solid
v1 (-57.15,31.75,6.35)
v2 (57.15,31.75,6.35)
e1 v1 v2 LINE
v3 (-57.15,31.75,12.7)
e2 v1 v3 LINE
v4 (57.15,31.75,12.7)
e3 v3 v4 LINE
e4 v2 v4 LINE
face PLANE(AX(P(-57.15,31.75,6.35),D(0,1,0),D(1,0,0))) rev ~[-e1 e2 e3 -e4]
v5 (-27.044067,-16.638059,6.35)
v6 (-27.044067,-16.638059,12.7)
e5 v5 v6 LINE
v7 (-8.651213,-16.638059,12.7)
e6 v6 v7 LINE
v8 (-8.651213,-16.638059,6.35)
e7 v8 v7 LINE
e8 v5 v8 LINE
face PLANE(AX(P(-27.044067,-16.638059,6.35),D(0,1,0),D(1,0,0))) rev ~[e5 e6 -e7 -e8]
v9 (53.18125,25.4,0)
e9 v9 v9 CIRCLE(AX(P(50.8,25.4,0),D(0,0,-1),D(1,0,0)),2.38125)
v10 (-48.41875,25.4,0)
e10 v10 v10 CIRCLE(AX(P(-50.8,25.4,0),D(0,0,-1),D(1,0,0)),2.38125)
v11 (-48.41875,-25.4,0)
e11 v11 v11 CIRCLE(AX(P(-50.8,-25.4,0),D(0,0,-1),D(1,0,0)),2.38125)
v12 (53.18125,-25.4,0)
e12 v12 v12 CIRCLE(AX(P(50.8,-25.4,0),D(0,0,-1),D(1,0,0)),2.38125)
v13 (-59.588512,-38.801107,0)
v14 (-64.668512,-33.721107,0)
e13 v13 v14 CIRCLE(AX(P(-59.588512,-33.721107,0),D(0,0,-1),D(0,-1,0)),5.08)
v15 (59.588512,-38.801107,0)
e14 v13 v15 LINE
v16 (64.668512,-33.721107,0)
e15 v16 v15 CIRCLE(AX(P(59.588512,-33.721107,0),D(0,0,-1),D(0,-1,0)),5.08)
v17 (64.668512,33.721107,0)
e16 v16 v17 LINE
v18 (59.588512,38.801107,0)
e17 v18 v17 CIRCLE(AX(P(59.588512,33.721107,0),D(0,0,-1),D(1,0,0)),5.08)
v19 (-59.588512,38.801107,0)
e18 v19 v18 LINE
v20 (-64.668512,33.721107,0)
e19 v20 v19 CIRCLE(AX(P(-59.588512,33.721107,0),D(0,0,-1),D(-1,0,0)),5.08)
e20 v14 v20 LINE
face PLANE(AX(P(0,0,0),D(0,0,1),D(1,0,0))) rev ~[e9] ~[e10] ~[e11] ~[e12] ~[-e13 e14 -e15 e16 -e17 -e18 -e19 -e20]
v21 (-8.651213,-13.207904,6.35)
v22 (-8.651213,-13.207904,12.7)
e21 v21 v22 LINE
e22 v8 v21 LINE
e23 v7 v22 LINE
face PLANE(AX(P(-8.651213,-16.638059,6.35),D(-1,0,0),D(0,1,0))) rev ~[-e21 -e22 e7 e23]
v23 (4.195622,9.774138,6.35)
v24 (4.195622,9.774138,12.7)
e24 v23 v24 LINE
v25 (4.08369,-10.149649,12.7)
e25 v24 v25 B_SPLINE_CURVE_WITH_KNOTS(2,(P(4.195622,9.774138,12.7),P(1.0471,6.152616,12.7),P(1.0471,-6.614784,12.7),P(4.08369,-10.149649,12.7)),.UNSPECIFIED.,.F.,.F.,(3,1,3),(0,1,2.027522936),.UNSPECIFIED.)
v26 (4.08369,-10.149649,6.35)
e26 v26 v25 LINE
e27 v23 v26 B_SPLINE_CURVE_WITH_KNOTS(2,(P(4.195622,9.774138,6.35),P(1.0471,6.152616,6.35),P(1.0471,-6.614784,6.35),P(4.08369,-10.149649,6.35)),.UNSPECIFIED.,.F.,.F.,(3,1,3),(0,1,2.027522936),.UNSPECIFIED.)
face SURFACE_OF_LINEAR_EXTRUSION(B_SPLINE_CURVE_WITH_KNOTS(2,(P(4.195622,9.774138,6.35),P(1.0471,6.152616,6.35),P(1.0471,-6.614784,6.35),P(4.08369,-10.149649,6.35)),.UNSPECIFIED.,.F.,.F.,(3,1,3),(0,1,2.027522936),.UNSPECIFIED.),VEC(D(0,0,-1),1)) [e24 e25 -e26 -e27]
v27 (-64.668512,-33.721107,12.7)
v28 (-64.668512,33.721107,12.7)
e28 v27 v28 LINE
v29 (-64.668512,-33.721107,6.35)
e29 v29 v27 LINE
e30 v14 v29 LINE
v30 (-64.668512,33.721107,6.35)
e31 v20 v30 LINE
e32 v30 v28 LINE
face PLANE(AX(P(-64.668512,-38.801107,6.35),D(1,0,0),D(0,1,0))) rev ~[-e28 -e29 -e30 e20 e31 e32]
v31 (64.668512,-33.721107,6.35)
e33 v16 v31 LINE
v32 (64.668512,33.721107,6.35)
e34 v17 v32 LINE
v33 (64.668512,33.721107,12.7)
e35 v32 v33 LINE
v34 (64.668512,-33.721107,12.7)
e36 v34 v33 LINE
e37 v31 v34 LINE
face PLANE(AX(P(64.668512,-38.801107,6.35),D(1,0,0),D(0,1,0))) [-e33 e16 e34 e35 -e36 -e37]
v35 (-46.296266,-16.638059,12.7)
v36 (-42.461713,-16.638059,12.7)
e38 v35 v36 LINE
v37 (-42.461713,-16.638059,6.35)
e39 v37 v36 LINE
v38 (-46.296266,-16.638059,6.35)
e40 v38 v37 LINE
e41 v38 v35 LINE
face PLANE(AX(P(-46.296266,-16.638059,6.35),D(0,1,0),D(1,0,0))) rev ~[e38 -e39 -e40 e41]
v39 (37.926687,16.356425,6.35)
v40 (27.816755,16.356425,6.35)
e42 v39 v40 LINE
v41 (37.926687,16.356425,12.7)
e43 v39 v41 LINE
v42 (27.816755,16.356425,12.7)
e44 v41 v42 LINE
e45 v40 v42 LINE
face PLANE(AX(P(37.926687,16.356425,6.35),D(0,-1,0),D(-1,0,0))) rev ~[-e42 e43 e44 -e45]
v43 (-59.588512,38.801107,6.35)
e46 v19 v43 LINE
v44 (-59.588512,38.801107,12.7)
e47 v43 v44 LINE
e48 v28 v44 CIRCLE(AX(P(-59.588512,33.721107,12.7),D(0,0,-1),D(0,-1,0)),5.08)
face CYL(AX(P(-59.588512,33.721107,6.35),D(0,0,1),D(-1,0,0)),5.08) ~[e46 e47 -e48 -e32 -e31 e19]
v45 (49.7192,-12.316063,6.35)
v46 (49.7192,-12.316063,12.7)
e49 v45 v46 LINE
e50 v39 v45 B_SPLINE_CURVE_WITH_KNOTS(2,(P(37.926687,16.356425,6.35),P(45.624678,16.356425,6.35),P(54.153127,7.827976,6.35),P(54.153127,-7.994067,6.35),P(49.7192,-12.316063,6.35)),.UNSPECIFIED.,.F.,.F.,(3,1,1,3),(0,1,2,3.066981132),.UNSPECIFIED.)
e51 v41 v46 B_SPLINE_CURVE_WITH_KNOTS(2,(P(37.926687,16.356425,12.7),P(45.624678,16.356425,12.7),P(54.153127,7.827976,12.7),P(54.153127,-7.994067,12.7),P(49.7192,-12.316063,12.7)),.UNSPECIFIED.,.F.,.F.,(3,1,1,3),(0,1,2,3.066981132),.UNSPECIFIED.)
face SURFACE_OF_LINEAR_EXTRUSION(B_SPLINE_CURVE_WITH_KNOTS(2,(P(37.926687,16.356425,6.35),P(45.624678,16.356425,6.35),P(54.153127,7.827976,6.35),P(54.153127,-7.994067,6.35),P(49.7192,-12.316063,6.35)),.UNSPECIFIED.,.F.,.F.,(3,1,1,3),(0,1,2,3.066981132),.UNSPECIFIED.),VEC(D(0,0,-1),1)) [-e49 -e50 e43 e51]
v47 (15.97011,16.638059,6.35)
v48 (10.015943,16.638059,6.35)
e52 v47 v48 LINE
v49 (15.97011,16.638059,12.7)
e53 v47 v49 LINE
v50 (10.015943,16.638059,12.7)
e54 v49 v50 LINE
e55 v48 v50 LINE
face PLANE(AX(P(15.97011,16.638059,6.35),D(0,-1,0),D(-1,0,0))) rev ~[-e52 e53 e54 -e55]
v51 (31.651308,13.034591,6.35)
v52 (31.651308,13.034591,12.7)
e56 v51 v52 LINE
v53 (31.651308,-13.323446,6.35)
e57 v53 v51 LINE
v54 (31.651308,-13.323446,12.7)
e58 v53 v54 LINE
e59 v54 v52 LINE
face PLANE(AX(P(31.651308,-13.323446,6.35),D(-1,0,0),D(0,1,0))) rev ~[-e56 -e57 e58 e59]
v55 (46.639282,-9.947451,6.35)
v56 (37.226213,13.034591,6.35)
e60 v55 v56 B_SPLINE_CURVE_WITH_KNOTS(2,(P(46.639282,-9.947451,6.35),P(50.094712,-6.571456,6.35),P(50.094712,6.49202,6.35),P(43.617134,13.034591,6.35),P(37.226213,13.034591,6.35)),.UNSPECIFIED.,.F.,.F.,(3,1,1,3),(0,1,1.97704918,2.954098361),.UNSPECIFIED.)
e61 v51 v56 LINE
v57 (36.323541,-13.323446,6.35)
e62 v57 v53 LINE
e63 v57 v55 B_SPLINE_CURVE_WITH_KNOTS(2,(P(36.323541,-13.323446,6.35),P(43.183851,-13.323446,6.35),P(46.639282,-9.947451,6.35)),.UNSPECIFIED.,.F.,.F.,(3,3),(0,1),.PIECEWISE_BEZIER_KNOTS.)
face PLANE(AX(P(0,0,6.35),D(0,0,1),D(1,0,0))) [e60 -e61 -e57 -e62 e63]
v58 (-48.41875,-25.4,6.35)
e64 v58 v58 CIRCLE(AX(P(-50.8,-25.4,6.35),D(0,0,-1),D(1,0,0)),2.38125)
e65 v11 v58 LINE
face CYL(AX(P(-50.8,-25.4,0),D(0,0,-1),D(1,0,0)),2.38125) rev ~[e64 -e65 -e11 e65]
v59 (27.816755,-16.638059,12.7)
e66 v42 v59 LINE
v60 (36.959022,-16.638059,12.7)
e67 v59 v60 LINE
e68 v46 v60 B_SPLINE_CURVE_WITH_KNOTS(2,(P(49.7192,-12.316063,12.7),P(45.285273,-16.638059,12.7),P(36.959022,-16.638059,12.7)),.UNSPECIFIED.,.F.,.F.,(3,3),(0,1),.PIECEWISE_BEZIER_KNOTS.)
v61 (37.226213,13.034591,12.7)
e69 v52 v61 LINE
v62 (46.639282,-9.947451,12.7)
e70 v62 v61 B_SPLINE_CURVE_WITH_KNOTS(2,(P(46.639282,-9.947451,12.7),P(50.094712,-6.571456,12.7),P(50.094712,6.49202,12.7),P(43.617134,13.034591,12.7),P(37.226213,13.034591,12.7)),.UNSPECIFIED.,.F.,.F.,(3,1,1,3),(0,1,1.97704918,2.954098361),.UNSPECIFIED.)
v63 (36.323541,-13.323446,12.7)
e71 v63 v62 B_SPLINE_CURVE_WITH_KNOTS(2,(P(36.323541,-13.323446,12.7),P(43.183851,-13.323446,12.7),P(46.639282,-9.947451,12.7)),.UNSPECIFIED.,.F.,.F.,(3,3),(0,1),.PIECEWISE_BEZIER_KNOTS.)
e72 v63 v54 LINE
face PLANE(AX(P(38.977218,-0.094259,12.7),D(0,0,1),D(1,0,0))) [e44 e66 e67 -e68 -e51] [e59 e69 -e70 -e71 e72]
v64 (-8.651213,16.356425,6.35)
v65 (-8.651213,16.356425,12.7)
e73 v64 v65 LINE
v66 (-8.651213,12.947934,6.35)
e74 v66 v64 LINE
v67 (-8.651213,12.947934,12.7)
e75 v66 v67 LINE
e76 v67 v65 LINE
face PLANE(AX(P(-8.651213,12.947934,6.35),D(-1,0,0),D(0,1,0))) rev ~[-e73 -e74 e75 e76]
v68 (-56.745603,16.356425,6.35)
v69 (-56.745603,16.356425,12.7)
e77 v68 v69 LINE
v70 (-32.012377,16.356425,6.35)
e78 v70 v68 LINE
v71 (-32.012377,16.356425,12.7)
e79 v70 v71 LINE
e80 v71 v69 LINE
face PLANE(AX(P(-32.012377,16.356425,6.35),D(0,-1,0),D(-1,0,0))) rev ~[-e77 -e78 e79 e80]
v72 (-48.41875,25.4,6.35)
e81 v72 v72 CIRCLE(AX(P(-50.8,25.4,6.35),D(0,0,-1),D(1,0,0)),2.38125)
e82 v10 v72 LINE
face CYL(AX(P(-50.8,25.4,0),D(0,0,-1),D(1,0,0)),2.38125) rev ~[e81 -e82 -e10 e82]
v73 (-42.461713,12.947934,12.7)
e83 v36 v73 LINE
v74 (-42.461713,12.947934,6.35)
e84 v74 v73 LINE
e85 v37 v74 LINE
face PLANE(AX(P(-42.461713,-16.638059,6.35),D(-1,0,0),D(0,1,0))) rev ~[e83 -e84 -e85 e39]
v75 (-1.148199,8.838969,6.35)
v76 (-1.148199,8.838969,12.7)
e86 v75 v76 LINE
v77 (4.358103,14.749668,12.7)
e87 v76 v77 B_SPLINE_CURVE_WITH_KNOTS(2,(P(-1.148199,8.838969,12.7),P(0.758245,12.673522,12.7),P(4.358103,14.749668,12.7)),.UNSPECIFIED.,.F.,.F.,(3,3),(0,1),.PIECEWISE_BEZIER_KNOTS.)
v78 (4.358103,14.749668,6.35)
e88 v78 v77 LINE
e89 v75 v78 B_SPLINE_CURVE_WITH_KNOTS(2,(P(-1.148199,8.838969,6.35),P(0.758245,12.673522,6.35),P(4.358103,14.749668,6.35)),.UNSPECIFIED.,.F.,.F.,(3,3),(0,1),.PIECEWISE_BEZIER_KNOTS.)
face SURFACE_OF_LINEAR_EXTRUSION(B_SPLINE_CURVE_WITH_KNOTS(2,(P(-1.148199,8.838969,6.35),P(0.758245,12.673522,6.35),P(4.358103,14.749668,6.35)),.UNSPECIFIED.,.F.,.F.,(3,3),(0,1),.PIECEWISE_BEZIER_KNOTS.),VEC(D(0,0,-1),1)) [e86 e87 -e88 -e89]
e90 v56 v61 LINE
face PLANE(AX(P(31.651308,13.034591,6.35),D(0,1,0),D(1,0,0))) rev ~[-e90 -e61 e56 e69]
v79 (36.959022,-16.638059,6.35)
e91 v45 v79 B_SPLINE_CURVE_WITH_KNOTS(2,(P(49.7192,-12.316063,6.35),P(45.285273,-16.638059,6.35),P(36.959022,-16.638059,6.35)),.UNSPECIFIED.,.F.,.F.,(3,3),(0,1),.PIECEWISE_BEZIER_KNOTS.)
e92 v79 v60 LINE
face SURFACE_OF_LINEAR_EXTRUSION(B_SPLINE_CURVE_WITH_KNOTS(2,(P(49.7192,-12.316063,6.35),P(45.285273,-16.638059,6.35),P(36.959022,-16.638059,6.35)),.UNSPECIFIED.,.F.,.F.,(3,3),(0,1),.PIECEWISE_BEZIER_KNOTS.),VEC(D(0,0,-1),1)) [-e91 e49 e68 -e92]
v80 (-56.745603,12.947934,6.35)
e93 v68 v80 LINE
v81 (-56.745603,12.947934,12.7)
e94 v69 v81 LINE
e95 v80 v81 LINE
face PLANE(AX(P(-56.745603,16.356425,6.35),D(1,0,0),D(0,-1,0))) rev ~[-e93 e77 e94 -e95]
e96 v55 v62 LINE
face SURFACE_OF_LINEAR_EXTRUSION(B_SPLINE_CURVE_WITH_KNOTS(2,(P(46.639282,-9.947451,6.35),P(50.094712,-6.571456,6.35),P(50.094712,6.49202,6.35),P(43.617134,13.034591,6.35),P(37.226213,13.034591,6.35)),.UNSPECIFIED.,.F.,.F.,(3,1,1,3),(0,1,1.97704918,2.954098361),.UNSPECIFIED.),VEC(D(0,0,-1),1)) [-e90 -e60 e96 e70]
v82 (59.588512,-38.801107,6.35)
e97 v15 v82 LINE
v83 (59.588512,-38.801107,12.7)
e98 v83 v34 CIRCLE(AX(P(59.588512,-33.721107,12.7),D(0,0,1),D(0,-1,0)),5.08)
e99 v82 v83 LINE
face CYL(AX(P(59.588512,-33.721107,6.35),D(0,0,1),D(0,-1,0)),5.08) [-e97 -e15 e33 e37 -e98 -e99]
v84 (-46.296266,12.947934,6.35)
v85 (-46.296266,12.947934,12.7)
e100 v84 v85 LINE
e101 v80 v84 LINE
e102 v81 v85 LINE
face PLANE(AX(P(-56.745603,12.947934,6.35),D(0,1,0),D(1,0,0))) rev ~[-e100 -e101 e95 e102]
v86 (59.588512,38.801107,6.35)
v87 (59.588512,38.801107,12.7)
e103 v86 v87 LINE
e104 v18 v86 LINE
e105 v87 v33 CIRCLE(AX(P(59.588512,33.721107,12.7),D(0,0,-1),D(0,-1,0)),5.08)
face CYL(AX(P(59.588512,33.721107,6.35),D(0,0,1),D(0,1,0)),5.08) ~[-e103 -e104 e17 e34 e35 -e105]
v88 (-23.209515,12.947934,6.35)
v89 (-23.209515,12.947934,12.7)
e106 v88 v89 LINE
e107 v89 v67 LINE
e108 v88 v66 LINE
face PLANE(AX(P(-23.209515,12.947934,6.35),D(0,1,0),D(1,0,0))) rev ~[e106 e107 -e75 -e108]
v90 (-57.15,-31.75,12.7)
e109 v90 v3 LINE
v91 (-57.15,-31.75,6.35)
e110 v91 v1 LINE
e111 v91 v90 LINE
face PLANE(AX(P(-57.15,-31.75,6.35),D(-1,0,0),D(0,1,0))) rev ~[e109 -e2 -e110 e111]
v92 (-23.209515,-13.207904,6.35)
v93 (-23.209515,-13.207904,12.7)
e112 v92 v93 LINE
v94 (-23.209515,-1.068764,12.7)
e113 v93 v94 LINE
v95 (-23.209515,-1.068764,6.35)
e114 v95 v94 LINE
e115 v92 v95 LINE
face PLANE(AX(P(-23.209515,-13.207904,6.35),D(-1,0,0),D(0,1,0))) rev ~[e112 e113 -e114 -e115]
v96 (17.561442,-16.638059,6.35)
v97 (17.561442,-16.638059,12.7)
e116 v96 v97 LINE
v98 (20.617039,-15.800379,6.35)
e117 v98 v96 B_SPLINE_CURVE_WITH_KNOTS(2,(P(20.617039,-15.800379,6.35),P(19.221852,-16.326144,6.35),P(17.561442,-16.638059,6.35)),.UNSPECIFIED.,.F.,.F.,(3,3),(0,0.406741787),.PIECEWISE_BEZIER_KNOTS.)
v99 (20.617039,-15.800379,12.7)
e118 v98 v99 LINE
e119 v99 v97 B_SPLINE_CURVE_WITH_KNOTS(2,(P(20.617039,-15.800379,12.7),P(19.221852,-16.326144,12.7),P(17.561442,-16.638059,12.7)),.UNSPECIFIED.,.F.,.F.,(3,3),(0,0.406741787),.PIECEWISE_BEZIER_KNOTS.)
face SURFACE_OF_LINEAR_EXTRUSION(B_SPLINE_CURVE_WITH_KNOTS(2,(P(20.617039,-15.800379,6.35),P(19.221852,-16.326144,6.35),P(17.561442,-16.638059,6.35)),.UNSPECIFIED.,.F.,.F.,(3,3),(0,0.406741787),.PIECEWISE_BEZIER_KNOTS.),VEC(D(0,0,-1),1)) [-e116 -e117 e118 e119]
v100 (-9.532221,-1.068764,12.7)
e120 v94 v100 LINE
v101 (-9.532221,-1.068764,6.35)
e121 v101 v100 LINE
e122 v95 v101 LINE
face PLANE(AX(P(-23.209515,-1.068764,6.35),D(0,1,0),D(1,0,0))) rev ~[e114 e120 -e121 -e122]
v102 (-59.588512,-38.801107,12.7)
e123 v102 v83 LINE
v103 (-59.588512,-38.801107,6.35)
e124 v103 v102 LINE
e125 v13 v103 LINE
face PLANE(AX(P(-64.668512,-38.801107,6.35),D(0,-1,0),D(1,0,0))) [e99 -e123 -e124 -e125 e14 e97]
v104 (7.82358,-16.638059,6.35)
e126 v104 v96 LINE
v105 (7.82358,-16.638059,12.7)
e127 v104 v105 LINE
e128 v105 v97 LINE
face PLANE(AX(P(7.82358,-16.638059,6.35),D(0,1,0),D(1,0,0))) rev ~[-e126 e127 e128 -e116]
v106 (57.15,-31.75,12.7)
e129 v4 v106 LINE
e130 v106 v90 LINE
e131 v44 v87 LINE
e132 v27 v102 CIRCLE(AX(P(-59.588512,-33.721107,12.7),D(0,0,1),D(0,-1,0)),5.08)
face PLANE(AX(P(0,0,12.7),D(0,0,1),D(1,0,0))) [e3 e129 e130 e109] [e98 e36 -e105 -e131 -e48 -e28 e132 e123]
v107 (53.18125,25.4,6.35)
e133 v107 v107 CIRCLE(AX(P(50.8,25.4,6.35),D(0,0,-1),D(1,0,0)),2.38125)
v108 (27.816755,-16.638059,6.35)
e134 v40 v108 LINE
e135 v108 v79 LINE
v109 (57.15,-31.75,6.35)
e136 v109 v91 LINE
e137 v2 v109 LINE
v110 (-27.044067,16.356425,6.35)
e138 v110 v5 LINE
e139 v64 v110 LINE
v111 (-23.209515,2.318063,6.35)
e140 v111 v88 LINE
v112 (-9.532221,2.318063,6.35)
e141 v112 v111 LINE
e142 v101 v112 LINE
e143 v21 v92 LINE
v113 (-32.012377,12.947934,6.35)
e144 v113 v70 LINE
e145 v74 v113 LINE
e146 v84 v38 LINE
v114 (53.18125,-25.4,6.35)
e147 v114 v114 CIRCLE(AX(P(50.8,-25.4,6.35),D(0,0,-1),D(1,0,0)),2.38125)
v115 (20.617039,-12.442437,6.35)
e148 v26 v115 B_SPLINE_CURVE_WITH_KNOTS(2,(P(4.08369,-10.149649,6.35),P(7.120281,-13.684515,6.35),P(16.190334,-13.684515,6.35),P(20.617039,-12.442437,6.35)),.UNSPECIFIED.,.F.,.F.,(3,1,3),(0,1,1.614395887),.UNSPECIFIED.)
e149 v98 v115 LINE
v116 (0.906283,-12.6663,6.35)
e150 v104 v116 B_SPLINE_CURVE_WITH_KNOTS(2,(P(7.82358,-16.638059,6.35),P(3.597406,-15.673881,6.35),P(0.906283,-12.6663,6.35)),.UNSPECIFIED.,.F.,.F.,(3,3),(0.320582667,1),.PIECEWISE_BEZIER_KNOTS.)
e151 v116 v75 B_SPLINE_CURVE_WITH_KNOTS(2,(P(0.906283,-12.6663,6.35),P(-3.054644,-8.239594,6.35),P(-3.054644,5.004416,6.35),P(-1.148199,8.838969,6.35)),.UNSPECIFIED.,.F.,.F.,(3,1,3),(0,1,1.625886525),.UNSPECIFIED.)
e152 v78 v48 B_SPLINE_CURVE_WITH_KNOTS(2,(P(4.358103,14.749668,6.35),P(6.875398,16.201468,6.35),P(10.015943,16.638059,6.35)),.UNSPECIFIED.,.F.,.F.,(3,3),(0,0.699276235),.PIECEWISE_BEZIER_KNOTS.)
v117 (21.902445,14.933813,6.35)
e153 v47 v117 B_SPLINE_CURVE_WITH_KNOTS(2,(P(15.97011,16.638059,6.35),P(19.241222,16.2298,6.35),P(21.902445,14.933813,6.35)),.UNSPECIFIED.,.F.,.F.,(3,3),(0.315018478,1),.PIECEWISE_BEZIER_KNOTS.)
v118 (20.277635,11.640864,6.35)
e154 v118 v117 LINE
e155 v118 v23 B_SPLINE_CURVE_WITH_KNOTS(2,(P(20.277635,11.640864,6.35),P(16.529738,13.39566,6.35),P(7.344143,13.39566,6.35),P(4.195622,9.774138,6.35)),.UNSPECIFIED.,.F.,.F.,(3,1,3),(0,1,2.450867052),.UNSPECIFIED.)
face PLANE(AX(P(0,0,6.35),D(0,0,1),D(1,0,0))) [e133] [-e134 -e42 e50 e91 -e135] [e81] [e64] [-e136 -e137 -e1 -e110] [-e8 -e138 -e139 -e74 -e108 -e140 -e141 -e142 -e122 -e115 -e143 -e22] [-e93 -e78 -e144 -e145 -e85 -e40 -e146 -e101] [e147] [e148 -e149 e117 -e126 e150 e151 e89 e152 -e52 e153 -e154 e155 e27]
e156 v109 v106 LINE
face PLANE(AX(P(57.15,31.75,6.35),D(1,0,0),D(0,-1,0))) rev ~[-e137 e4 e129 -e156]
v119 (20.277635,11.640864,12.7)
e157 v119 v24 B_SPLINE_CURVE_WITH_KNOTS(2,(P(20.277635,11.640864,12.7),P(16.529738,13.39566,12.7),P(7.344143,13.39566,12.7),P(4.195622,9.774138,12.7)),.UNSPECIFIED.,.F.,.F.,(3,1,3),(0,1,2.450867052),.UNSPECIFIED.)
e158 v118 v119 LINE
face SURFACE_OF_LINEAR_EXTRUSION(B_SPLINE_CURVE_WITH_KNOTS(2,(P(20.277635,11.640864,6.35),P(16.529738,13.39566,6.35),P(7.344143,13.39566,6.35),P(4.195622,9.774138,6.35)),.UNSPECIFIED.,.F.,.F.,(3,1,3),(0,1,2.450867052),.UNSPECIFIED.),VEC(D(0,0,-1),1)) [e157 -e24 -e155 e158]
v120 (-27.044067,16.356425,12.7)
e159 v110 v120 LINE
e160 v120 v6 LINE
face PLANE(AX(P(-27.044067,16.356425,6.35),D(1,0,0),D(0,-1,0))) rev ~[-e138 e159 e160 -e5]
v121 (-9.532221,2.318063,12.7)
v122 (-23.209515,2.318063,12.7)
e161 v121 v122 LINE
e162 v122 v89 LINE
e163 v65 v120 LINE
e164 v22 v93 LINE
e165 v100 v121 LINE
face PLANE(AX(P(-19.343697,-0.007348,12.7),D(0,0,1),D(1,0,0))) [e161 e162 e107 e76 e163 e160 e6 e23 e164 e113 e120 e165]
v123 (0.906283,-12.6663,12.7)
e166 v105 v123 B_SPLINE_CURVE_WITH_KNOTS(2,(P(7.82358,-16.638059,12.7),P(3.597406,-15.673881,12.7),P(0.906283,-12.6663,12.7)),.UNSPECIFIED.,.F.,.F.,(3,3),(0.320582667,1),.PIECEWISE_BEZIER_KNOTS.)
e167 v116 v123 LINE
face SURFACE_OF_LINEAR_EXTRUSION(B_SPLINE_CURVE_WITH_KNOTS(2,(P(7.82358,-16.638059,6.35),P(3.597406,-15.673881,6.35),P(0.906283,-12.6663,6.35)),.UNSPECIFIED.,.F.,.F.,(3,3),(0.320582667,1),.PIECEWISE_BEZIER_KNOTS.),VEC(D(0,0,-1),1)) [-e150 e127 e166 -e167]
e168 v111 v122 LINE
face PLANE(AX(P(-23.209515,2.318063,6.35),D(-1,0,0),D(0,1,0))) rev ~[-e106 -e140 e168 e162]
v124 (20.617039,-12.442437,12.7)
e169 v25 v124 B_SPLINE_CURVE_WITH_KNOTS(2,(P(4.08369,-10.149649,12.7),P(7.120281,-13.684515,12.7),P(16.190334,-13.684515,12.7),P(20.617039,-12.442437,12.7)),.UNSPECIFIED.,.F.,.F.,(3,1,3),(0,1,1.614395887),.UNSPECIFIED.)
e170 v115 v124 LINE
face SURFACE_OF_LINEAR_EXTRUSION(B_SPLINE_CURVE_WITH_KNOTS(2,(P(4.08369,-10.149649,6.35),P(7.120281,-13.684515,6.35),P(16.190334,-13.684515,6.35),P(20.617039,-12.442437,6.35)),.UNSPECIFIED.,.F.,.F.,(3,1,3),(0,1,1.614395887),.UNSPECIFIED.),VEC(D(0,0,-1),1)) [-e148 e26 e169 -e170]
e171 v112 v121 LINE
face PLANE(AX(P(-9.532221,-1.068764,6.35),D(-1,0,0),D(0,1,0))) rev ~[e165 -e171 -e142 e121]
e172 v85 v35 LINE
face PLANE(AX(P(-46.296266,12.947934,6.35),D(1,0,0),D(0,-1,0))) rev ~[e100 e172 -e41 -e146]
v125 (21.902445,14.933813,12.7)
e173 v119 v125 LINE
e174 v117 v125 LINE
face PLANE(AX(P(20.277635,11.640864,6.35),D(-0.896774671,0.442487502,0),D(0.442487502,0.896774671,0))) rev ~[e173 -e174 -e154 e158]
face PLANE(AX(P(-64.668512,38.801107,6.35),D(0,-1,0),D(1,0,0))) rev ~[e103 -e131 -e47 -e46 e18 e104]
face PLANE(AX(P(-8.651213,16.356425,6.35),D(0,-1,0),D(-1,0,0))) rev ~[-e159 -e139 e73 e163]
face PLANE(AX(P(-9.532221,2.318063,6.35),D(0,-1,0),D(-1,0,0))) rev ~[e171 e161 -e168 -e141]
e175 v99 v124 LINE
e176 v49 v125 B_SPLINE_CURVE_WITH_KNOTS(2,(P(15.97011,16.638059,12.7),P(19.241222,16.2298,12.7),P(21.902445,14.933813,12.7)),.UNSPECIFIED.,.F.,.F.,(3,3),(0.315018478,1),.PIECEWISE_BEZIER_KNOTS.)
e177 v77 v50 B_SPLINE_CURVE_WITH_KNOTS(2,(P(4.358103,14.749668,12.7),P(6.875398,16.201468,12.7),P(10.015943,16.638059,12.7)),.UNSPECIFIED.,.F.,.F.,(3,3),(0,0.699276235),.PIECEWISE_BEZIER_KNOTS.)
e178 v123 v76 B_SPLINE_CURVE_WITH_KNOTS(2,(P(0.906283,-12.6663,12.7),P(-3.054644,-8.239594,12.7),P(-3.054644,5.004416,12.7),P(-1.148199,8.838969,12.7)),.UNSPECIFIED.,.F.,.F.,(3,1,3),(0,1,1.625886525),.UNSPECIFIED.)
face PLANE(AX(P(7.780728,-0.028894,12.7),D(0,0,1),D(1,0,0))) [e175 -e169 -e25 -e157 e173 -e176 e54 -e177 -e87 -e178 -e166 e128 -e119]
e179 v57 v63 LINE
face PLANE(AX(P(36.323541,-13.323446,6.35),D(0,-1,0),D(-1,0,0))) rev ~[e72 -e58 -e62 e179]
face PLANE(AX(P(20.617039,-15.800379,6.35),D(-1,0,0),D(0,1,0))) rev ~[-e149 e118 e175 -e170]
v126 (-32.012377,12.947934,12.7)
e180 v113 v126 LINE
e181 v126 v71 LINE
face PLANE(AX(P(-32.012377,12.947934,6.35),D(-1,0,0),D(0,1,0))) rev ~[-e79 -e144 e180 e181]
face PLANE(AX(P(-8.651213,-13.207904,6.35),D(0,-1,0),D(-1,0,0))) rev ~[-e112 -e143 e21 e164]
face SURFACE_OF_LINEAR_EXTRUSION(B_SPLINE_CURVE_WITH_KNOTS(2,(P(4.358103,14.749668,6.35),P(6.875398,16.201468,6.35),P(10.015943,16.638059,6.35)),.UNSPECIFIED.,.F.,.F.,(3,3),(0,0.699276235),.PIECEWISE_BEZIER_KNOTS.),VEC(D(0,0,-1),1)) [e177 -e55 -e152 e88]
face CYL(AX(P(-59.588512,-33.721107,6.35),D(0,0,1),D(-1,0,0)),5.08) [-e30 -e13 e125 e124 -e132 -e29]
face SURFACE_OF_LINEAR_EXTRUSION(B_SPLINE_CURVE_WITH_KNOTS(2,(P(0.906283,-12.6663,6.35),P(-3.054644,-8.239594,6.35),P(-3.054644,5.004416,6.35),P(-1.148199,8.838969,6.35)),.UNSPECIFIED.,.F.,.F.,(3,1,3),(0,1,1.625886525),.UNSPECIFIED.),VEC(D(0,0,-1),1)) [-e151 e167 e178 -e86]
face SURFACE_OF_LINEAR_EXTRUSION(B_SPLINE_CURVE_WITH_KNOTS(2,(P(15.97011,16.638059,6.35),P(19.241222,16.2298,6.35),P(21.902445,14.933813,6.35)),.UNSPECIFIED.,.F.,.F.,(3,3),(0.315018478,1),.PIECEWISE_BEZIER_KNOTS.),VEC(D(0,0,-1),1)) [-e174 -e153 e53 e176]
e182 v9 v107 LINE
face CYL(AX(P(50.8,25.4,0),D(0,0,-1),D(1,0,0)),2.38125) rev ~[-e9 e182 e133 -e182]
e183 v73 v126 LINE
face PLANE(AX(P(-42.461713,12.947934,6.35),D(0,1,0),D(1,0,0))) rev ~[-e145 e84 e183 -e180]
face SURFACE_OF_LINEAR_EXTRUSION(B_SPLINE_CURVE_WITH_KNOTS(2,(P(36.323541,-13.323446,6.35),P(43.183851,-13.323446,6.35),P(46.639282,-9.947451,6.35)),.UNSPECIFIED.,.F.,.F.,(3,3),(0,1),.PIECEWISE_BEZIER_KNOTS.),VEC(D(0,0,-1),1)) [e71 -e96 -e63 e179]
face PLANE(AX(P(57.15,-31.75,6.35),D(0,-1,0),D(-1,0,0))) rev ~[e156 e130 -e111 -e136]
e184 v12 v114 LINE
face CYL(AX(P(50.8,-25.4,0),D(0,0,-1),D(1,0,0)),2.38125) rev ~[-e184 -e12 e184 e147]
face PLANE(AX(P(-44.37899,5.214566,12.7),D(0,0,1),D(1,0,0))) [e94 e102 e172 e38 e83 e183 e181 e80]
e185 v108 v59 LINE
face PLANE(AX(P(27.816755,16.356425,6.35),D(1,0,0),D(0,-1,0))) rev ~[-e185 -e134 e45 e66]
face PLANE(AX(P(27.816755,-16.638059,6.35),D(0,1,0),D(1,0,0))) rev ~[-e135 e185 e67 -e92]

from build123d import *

# Parameters (mm, degrees)
F0_W         = 127
F0_H         = 76.2
F1_DEPTH     = 6.35
F2_R         = 5.08
F4_W         = 129.3370249418
F4_H         = 77.6022149651
F5_DEPTH     = 6.35
F6_R         = 5.08
F7_DEPTH     = 6.35
F8_R         = 2.38125
F9_DEPTH     = 25.4
F10_DEPTH    = 6.35
F11_T1_DEPTH = 31.75


# Not quite as in the source:
# - a fillet or chamfer that OpenCascade refuses, or shapes differently, is made with other operations: its cross-section is extruded or revolved along the edge and cut away or added


with BuildPart() as f1:
    # F0 (on Top) → F1 (new body)
    with BuildSketch(Plane.XY):
        Rectangle(F0_W, F0_H)
    extrude(amount=F1_DEPTH)

    # F2
    f2_edges = [f1.edges().sort_by_distance(p)[0] for p in [
        (-63.5, 38.1, 3.175),
        (-63.5, -38.1, 3.175),
        (63.5, -38.1, 3.175),
        (63.5, 38.1, 3.175),
    ]]
    fillet(f2_edges, radius=F2_R)

    # F4 (on offset) → F5 (join)
    with BuildSketch(Plane.XY.offset(6.35)):
        Rectangle(F4_W, F4_H)
        Polygon((-57.15, -16.6380591357), (-57.15, 16.6380591357), (-57.15, 31.75), (57.15, 31.75), (57.15, 16.6380591357), (57.15, -16.6380591357), (57.15, -31.75), (-57.15, -31.75), align=None, mode=Mode.SUBTRACT)
    extrude(amount=F5_DEPTH)

    # F6
    f6_edges = [f1.edges().sort_by_distance(p)[0] for p in [
        (-64.668512, -38.801107, 9.525),
        (64.668512, 38.801107, 9.525),
        (64.668512, -38.801107, 9.525),
        (-64.668512, 38.801107, 9.525),
    ]]
    fillet(f6_edges, radius=F6_R)

    # F4 (on offset) → F7 (join)
    with BuildSketch(Plane.XY.offset(6.35)):
        Polygon((-46.2962661107, 12.9479340409), (-46.2962661107, -16.6380591357), (-42.4617134193, -16.6380591357), (-42.4617134193, 12.9479340409), (-32.0123768006, 12.9479340409), (-32.0123768006, 16.3564253222), (-56.7456027293, 16.3564253222), (-56.7456027293, 12.9479340409), align=None)
        Polygon((-27.0440674754, 16.3564253222), (-27.0440674754, -16.6380591357), (-8.6512130402, -16.6380591357), (-8.6512130402, -13.2079037149), (-23.2095147839, -13.2079037149), (-23.2095147839, -1.0687642153), (-9.5322213798, -1.0687642153), (-9.5322213798, 2.3180629265), (-23.2095147839, 2.3180629265), (-23.2095147839, 12.9479340409), (-8.6512130402, 12.9479340409), (-8.6512130402, 16.3564253222), align=None)
        with BuildLine():
            Line((15.9701099418, 16.6380591357), (10.0159430302, 16.6380591357))
            add(Edge.make_bspline(
                [(4.3581027293, 14.7496683093), (6.8753977724, 16.2014683592), (10.0159430302, 16.6380591357)],
                knots=[0, 0, 0, 0.6992762354, 0.6992762354, 0.6992762354], degree=2))
            add(Edge.make_bspline(
                [(-1.1481993935, 8.8389689158), (0.7582448825, 12.6735216073), (4.3581027293, 14.7496683093)],
                knots=[0, 0, 0, 1, 1, 1], degree=2))
            add(Edge.make_bspline(
                [(-3.0546436694, -0.0938779378), (-3.0546436694, 5.0044162244), (-1.1481993935, 8.8389689158)],
                knots=[0, 0, 0, 1, 1, 1], degree=2))
            add(Edge.make_bspline(
                [(0.9062831691, -12.6663002274), (-3.0546436694, -8.2395943897), (-3.0546436694, -0.0938779378)],
                knots=[0, 0, 0, 1, 1, 1], degree=2))
            add(Edge.make_bspline(
                [(7.8235797826, -16.6380591357), (3.5974055182, -15.6738809021), (0.9062831691, -12.6663002274)],
                knots=[0.3205826669, 0.3205826669, 0.3205826669, 1, 1, 1], degree=2))
            Line((7.8235797826, -16.6380591357), (17.5614415983, -16.6380591357))
            add(Edge.make_bspline(
                [(20.6170394238, -15.8003790751), (19.2218518782, -16.326144487), (17.5614415983, -16.6380591357)],
                knots=[0, 0, 0, 0.406741787, 0.406741787, 0.406741787], degree=2))
            Line((20.6170394238, -15.8003790751), (20.6170394238, -12.4424374526))
            add(Edge.make_bspline(
                [(12.7385140258, -13.6845147839), (16.1903335861, -13.6845147839), (20.6170394238, -12.4424374526)],
                knots=[0, 0, 0, 1, 1, 1], degree=2))
            add(Edge.make_bspline(
                [(4.0836902957, -10.1496493556), (7.1202805155, -13.6845147839), (12.7385140258, -13.6845147839)],
                knots=[0, 0, 0, 1, 1, 1], degree=2))
            add(Edge.make_bspline(
                [(1.0471000758, -0.1444275967), (1.0471000758, -6.6147839272), (4.0836902957, -10.1496493556)],
                knots=[0, 0, 0, 1, 1, 1], degree=2))
            add(Edge.make_bspline(
                [(4.1956216831, 9.7741376042), (1.0471000758, 6.1526156179), (1.0471000758, -0.1444275967)],
                knots=[0, 0, 0, 1, 1, 1], degree=2))
            add(Edge.make_bspline(
                [(12.7818423048, 13.3956595906), (7.3441432904, 13.3956595906), (4.1956216831, 9.7741376042)],
                knots=[0, 0, 0, 1, 1, 1], degree=2))
            add(Edge.make_bspline(
                [(20.2776345716, 11.6408642911), (16.5297384382, 13.3956595906), (12.7818423048, 13.3956595906)],
                knots=[0, 0, 0, 1, 1, 1], degree=2))
            Line((20.2776345716, 11.6408642911), (21.9024450341, 14.9338134951))
            add(Edge.make_bspline(
                [(15.9701099418, 16.6380591357), (19.2412217115, 16.2297995741), (21.9024450341, 14.9338134951)],
                knots=[0.3150184776, 0.3150184776, 0.3150184776, 1, 1, 1], degree=2))
        make_face()
        with BuildLine():
            Line((27.8167551175, -16.6380591357), (36.9590219864, -16.6380591357))
            add(Edge.make_bspline(
                [(49.7192001516, -12.3160633055), (45.285272934, -16.6380591357), (36.9590219864, -16.6380591357)],
                knots=[0, 0, 0, 1, 1, 1], degree=2))
            add(Edge.make_bspline(
                [(54.1531273692, 0.173313116), (54.1531273692, -7.9940674754), (49.7192001516, -12.3160633055)],
                knots=[0, 0, 0, 1, 1, 1], degree=2))
            add(Edge.make_bspline(
                [(49.8889025777, 12.0922005307), (54.1531273692, 7.8279757392), (54.1531273692, 0.173313116)],
                knots=[0, 0, 0, 1, 1, 1], degree=2))
            add(Edge.make_bspline(
                [(37.926686884, 16.3564253222), (45.6246777862, 16.3564253222), (49.8889025777, 12.0922005307)],
                knots=[0, 0, 0, 1, 1, 1], degree=2))
            Line((37.926686884, 16.3564253222), (27.8167551175, 16.3564253222))
            Line((27.8167551175, 16.3564253222), (27.8167551175, -16.6380591357))
        make_face()
        with BuildLine():
            add(Edge.make_bspline(
                [(50.094711903, 0.0361068992), (50.094711903, 6.4920204701), (46.8559230478, 9.7633055345)],
                knots=[0, 0, 0, 1, 1, 1], degree=2))
            add(Edge.make_bspline(
                [(46.6392816528, -9.9474507202), (50.094711903, -6.5714556482), (50.094711903, 0.0361068992)],
                knots=[0, 0, 0, 1, 1, 1], degree=2))
            add(Edge.make_bspline(
                [(36.323540561, -13.3234457923), (43.1838514026, -13.3234457923), (46.6392816528, -9.9474507202)],
                knots=[0, 0, 0, 1, 1, 1], degree=2))
            Line((36.323540561, -13.3234457923), (31.6513078089, -13.3234457923))
            Line((31.6513078089, -13.3234457923), (31.6513078089, 13.0345905989))
            Line((31.6513078089, 13.0345905989), (37.2262130402, 13.0345905989))
            add(Edge.make_bspline(
                [(46.8559230478, 9.7633055345), (43.6171341926, 13.0345905989), (37.2262130402, 13.0345905989)],
                knots=[0, 0, 0, 1, 1, 1], degree=2))
        make_face(mode=Mode.SUBTRACT)
    extrude(amount=F7_DEPTH)

    # F8 (on face) → F9 (cut)
    with BuildSketch(Plane(origin=(0, 0, 0), x_dir=(1, 0, 0), z_dir=(0, 0, -1))):
        with Locations((-50.8, 25.4)):
            Circle(F8_R)
        with Locations((-50.8, -25.4)):
            Circle(F8_R)
        with Locations((50.8, -25.4)):
            Circle(F8_R)
        with Locations((50.8, 25.4)):
            Circle(F8_R)
    extrude(amount=-F9_DEPTH, mode=Mode.SUBTRACT)

    # F4 (on offset) → F10 (join)
    with BuildSketch(Plane.XY.offset(6.35)):
        Rectangle(F4_W, F4_H)
        Polygon((-57.15, -16.6380591357), (-57.15, 16.6380591357), (-57.15, 31.75), (57.15, 31.75), (57.15, 16.6380591357), (57.15, -16.6380591357), (57.15, -31.75), (-57.15, -31.75), align=None, mode=Mode.SUBTRACT)
    extrude(amount=-F10_DEPTH)

    # F11: fillet of radius 5.08 on 4 edges, made by hand

    # F11_s2 → F11_t1 (cut)
    with BuildSketch(Plane.XY.offset(-12.7)):
        with BuildLine():
            ThreePointArc((-64.6685124709, 33.7211074825), (-63.1806149193, 37.313209931), (-59.5885124709, 38.8011074825))
            Line((-59.5885124709, 38.8011074825), (-64.6685124709, 38.8011074825))
            Line((-64.6685124709, 38.8011074825), (-64.6685124709, 33.7211074825))
        make_face()
        with BuildLine():
            ThreePointArc((-59.5885124709, -38.8011074825), (-63.1806149193, -37.313209931), (-64.6685124709, -33.7211074825))
            Line((-64.6685124709, -33.7211074825), (-64.6685124709, -38.8011074825))
            Line((-64.6685124709, -38.8011074825), (-59.5885124709, -38.8011074825))
        make_face()
        with BuildLine():
            ThreePointArc((59.5885124709, -38.8011074825), (63.1806149193, -37.313209931), (64.6685124709, -33.7211074825))
            Line((64.6685124709, -33.7211074825), (64.6685124709, -38.8011074825))
            Line((64.6685124709, -38.8011074825), (59.5885124709, -38.8011074825))
        make_face()
        with BuildLine():
            ThreePointArc((64.6685124709, 33.7211074825), (63.1806149193, 37.313209931), (59.5885124709, 38.8011074825))
            Line((59.5885124709, 38.8011074825), (64.6685124709, 38.8011074825))
            Line((64.6685124709, 38.8011074825), (64.6685124709, 33.7211074825))
        make_face()
    extrude(amount=F11_T1_DEPTH, mode=Mode.SUBTRACT)


solid = f1.part
